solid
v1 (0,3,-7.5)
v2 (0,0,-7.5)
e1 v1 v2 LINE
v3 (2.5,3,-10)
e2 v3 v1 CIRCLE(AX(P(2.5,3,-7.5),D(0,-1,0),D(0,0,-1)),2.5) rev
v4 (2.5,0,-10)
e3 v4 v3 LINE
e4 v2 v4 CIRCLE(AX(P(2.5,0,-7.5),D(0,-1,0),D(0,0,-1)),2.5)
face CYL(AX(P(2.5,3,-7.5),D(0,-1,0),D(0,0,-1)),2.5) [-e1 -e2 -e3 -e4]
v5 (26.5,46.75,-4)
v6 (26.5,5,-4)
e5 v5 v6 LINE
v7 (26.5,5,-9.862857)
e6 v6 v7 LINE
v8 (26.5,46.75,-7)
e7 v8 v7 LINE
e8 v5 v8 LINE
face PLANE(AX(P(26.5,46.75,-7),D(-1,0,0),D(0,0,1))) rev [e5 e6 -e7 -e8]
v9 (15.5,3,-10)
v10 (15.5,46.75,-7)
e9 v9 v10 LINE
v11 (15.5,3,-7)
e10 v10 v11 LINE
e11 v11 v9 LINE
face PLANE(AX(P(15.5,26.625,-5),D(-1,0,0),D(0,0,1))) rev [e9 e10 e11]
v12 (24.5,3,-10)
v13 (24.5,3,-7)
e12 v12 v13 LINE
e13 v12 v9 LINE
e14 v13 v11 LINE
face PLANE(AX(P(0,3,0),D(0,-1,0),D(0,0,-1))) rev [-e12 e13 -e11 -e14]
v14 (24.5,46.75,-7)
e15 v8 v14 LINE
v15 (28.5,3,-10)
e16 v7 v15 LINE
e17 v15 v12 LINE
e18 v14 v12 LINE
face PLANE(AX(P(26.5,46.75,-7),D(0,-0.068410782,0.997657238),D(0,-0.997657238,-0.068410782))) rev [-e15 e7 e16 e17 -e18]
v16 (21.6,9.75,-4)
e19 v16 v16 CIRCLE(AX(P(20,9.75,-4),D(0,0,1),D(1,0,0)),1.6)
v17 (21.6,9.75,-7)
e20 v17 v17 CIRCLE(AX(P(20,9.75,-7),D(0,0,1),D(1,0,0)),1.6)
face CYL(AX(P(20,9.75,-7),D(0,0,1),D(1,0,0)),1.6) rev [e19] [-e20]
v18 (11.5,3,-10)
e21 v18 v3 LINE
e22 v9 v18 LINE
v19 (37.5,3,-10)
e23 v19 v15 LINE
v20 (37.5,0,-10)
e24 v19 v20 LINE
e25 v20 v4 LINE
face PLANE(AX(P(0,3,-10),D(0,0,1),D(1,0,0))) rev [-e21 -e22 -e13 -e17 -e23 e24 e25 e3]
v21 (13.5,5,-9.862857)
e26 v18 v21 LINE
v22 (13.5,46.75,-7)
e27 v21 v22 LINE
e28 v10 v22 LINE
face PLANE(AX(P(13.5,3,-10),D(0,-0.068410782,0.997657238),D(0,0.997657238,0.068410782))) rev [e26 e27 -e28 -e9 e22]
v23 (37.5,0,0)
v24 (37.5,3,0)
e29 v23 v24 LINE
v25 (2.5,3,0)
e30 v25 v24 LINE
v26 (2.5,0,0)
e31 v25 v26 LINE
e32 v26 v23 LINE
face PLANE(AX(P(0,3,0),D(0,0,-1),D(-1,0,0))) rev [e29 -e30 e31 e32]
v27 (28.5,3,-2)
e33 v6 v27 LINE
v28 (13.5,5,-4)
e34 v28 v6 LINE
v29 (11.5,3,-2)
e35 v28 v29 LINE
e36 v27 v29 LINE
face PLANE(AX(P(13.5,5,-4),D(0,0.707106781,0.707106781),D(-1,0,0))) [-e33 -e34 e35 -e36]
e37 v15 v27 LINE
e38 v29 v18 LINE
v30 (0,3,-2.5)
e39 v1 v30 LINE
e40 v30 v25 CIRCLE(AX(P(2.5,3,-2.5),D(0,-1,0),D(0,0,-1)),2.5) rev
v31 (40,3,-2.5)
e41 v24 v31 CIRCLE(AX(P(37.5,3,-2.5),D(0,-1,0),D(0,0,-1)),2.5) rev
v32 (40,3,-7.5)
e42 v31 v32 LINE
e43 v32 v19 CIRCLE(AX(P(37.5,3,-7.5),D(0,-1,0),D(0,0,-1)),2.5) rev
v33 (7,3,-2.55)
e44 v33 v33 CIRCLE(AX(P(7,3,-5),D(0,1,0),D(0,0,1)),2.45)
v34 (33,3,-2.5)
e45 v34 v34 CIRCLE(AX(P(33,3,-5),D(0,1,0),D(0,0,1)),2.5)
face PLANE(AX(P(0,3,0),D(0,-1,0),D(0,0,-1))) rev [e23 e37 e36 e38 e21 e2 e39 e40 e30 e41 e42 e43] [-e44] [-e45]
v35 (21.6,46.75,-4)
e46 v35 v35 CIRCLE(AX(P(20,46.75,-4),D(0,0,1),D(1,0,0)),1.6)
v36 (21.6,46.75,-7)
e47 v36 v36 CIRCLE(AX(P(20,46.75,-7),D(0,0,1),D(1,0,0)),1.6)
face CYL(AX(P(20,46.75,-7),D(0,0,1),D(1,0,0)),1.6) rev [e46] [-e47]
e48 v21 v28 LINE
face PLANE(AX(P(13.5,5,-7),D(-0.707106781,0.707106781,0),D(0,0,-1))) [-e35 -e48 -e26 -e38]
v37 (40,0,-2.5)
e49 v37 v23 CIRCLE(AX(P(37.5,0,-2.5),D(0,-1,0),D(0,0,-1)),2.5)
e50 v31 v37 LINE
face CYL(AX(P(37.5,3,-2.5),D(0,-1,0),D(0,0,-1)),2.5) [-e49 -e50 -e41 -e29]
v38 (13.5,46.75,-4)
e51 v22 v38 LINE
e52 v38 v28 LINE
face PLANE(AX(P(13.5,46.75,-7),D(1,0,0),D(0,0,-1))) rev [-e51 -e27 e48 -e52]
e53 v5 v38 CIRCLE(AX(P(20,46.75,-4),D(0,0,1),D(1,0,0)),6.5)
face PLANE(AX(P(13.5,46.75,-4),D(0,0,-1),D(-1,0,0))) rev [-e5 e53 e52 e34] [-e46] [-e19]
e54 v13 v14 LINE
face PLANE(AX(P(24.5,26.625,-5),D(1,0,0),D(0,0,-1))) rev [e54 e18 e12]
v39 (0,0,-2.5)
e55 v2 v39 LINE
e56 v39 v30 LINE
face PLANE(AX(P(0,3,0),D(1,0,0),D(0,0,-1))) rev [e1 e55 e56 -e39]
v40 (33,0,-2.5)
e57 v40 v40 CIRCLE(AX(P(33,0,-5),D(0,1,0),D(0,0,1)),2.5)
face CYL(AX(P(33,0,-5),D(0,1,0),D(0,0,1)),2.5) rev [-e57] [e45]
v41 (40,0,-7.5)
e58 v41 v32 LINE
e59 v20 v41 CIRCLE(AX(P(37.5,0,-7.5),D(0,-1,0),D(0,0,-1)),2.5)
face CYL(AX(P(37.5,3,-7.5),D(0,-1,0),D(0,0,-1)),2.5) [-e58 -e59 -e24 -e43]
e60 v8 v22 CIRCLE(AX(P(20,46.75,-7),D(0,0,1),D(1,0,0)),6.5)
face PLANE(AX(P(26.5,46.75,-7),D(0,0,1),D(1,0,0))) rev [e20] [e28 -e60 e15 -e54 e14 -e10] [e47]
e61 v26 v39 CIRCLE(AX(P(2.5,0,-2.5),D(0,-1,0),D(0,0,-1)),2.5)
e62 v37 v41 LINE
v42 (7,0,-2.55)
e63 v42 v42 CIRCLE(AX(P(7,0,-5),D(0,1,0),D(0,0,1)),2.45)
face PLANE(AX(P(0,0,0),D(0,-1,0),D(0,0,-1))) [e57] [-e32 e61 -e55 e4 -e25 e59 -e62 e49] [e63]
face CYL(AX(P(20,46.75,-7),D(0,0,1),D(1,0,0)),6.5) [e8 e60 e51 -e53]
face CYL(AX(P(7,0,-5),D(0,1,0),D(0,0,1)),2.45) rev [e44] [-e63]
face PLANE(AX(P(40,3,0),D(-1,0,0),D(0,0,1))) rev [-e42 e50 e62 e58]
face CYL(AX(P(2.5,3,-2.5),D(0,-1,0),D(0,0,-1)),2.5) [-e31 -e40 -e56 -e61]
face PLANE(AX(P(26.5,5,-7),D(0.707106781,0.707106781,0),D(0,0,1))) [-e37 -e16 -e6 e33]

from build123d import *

# Parameters (mm, degrees)
SKETCH_1_W          = 40
SKETCH_1_H          = 10
EXTRUDE_1_DEPTH     = 3
SKETCH_2_W          = 13
SKETCH_2_H          = 3
EXTRUDE_2_DEPTH     = 43.75
EXTRUDE_3_DEPTH     = 3
RIB_1_REACH         = 62.314
SKETCH_5_WALL_W     = 166.48129864
SKETCH_5_WALL_H     = 2
RIB_2_REACH         = 62.314
SKETCH_7_WALL_W     = 166.48129864
SKETCH_7_WALL_H     = 2
SKETCH_8_R          = 1.6
CUT_EXTRUDE_1_DEPTH = 3
FILLET_1_R          = 2.5
SKETCH_9_R          = 2.45
SKETCH_9_R_2        = 2.5
CUT_EXTRUDE_5_DEPTH = 3
CHAMFER_2_SIZE      = 2


with BuildPart() as part:
    # 草图1 → 凸台-拉伸1 (new body)
    with BuildSketch(Plane(origin=(0, 0, 0), x_dir=(1, 0, 0), z_dir=(0, 1, 0))):
        with Locations((20, 5)):
            Rectangle(SKETCH_1_W, SKETCH_1_H)
    extrude(amount=EXTRUDE_1_DEPTH)

    # 草图2 → 凸台-拉伸2 (add)
    with BuildSketch(Plane(origin=(0, 3, 0), x_dir=(1, 0, 0), z_dir=(0, 1, 0))):
        with Locations((20, 5.5)):
            Rectangle(SKETCH_2_W, SKETCH_2_H)
    extrude(amount=EXTRUDE_2_DEPTH)

    # 草图4 → 凸台-拉伸3 (add)
    with BuildSketch(Plane.XY.offset(-4)):
        with BuildLine():
            Line((13.5, 46.75), (26.5, 46.75))
            ThreePointArc((26.5, 46.75), (20, 53.25), (13.5, 46.75))
        make_face()
    extrude(amount=-EXTRUDE_3_DEPTH)

    # 草图5 wall → 筋1 (add, up to next)
    with BuildSketch(Plane(origin=(13.5, 24.875, -8.5), x_dir=(0, 0.997657238183, 0.068410782047), z_dir=(0, 0.068410782047, -0.997657238183)), mode=Mode.PRIVATE) as rib_1_sk1:
        with Locations((0, 1)):
            Rectangle(SKETCH_5_WALL_W, SKETCH_5_WALL_H)
    rib_1_tool1 = extrude(rib_1_sk1.sketch, amount=-RIB_1_REACH, mode=Mode.PRIVATE) - part.part
    add(rib_1_tool1.solids().sort_by_distance((13.5, 24.875, -8.5))[0])

    # 草图7 wall → 筋2 (add, up to next)
    with BuildSketch(Plane(origin=(26.5, 24.875, -8.5), x_dir=(0, -0.997657238183, -0.068410782047), z_dir=(0, 0.068410782047, -0.997657238183)), mode=Mode.PRIVATE) as rib_2_sk1:
        with Locations((0, 1)):
            Rectangle(SKETCH_7_WALL_W, SKETCH_7_WALL_H)
    rib_2_tool1 = extrude(rib_2_sk1.sketch, amount=-RIB_2_REACH, mode=Mode.PRIVATE) - part.part
    add(rib_2_tool1.solids().sort_by_distance((26.5, 24.875, -8.5))[0])

    # 草图8 → 切除-拉伸1 (cut)
    with BuildSketch(Plane.XY.offset(-4)):
        with Locations((20, 9.75)):
            Circle(SKETCH_8_R)
        with Locations((20, 46.75)):
            Circle(SKETCH_8_R)
    extrude(amount=-CUT_EXTRUDE_1_DEPTH, mode=Mode.SUBTRACT)

    # 圆角1
    fillet_1_edges = [part.edges().sort_by_distance(p)[0] for p in [
        (0, 1.5, -10),
        (40, 1.5, -10),
        (40, 1.5, 0),
        (0, 1.5, 0),
    ]]
    fillet(fillet_1_edges, radius=FILLET_1_R)

    # 草图9 → 切除-拉伸5 (cut)
    with BuildSketch(Plane(origin=(0, 3, 0), x_dir=(1, 0, 0), z_dir=(0, 1, 0))):
        with Locations((7, 5)):
            Circle(SKETCH_9_R)
        with Locations((33, 5)):
            Circle(SKETCH_9_R_2)
    extrude(amount=-CUT_EXTRUDE_5_DEPTH, mode=Mode.SUBTRACT)

    # 倒角2
    chamfer_2_edges = [part.edges().sort_by_distance(p)[0] for p in [
        (20, 3, -4),
        (26.5, 3, -7),
        (13.5, 3, -7),
    ]]
    chamfer(chamfer_2_edges, length=CHAMFER_2_SIZE)


solid = part.part
